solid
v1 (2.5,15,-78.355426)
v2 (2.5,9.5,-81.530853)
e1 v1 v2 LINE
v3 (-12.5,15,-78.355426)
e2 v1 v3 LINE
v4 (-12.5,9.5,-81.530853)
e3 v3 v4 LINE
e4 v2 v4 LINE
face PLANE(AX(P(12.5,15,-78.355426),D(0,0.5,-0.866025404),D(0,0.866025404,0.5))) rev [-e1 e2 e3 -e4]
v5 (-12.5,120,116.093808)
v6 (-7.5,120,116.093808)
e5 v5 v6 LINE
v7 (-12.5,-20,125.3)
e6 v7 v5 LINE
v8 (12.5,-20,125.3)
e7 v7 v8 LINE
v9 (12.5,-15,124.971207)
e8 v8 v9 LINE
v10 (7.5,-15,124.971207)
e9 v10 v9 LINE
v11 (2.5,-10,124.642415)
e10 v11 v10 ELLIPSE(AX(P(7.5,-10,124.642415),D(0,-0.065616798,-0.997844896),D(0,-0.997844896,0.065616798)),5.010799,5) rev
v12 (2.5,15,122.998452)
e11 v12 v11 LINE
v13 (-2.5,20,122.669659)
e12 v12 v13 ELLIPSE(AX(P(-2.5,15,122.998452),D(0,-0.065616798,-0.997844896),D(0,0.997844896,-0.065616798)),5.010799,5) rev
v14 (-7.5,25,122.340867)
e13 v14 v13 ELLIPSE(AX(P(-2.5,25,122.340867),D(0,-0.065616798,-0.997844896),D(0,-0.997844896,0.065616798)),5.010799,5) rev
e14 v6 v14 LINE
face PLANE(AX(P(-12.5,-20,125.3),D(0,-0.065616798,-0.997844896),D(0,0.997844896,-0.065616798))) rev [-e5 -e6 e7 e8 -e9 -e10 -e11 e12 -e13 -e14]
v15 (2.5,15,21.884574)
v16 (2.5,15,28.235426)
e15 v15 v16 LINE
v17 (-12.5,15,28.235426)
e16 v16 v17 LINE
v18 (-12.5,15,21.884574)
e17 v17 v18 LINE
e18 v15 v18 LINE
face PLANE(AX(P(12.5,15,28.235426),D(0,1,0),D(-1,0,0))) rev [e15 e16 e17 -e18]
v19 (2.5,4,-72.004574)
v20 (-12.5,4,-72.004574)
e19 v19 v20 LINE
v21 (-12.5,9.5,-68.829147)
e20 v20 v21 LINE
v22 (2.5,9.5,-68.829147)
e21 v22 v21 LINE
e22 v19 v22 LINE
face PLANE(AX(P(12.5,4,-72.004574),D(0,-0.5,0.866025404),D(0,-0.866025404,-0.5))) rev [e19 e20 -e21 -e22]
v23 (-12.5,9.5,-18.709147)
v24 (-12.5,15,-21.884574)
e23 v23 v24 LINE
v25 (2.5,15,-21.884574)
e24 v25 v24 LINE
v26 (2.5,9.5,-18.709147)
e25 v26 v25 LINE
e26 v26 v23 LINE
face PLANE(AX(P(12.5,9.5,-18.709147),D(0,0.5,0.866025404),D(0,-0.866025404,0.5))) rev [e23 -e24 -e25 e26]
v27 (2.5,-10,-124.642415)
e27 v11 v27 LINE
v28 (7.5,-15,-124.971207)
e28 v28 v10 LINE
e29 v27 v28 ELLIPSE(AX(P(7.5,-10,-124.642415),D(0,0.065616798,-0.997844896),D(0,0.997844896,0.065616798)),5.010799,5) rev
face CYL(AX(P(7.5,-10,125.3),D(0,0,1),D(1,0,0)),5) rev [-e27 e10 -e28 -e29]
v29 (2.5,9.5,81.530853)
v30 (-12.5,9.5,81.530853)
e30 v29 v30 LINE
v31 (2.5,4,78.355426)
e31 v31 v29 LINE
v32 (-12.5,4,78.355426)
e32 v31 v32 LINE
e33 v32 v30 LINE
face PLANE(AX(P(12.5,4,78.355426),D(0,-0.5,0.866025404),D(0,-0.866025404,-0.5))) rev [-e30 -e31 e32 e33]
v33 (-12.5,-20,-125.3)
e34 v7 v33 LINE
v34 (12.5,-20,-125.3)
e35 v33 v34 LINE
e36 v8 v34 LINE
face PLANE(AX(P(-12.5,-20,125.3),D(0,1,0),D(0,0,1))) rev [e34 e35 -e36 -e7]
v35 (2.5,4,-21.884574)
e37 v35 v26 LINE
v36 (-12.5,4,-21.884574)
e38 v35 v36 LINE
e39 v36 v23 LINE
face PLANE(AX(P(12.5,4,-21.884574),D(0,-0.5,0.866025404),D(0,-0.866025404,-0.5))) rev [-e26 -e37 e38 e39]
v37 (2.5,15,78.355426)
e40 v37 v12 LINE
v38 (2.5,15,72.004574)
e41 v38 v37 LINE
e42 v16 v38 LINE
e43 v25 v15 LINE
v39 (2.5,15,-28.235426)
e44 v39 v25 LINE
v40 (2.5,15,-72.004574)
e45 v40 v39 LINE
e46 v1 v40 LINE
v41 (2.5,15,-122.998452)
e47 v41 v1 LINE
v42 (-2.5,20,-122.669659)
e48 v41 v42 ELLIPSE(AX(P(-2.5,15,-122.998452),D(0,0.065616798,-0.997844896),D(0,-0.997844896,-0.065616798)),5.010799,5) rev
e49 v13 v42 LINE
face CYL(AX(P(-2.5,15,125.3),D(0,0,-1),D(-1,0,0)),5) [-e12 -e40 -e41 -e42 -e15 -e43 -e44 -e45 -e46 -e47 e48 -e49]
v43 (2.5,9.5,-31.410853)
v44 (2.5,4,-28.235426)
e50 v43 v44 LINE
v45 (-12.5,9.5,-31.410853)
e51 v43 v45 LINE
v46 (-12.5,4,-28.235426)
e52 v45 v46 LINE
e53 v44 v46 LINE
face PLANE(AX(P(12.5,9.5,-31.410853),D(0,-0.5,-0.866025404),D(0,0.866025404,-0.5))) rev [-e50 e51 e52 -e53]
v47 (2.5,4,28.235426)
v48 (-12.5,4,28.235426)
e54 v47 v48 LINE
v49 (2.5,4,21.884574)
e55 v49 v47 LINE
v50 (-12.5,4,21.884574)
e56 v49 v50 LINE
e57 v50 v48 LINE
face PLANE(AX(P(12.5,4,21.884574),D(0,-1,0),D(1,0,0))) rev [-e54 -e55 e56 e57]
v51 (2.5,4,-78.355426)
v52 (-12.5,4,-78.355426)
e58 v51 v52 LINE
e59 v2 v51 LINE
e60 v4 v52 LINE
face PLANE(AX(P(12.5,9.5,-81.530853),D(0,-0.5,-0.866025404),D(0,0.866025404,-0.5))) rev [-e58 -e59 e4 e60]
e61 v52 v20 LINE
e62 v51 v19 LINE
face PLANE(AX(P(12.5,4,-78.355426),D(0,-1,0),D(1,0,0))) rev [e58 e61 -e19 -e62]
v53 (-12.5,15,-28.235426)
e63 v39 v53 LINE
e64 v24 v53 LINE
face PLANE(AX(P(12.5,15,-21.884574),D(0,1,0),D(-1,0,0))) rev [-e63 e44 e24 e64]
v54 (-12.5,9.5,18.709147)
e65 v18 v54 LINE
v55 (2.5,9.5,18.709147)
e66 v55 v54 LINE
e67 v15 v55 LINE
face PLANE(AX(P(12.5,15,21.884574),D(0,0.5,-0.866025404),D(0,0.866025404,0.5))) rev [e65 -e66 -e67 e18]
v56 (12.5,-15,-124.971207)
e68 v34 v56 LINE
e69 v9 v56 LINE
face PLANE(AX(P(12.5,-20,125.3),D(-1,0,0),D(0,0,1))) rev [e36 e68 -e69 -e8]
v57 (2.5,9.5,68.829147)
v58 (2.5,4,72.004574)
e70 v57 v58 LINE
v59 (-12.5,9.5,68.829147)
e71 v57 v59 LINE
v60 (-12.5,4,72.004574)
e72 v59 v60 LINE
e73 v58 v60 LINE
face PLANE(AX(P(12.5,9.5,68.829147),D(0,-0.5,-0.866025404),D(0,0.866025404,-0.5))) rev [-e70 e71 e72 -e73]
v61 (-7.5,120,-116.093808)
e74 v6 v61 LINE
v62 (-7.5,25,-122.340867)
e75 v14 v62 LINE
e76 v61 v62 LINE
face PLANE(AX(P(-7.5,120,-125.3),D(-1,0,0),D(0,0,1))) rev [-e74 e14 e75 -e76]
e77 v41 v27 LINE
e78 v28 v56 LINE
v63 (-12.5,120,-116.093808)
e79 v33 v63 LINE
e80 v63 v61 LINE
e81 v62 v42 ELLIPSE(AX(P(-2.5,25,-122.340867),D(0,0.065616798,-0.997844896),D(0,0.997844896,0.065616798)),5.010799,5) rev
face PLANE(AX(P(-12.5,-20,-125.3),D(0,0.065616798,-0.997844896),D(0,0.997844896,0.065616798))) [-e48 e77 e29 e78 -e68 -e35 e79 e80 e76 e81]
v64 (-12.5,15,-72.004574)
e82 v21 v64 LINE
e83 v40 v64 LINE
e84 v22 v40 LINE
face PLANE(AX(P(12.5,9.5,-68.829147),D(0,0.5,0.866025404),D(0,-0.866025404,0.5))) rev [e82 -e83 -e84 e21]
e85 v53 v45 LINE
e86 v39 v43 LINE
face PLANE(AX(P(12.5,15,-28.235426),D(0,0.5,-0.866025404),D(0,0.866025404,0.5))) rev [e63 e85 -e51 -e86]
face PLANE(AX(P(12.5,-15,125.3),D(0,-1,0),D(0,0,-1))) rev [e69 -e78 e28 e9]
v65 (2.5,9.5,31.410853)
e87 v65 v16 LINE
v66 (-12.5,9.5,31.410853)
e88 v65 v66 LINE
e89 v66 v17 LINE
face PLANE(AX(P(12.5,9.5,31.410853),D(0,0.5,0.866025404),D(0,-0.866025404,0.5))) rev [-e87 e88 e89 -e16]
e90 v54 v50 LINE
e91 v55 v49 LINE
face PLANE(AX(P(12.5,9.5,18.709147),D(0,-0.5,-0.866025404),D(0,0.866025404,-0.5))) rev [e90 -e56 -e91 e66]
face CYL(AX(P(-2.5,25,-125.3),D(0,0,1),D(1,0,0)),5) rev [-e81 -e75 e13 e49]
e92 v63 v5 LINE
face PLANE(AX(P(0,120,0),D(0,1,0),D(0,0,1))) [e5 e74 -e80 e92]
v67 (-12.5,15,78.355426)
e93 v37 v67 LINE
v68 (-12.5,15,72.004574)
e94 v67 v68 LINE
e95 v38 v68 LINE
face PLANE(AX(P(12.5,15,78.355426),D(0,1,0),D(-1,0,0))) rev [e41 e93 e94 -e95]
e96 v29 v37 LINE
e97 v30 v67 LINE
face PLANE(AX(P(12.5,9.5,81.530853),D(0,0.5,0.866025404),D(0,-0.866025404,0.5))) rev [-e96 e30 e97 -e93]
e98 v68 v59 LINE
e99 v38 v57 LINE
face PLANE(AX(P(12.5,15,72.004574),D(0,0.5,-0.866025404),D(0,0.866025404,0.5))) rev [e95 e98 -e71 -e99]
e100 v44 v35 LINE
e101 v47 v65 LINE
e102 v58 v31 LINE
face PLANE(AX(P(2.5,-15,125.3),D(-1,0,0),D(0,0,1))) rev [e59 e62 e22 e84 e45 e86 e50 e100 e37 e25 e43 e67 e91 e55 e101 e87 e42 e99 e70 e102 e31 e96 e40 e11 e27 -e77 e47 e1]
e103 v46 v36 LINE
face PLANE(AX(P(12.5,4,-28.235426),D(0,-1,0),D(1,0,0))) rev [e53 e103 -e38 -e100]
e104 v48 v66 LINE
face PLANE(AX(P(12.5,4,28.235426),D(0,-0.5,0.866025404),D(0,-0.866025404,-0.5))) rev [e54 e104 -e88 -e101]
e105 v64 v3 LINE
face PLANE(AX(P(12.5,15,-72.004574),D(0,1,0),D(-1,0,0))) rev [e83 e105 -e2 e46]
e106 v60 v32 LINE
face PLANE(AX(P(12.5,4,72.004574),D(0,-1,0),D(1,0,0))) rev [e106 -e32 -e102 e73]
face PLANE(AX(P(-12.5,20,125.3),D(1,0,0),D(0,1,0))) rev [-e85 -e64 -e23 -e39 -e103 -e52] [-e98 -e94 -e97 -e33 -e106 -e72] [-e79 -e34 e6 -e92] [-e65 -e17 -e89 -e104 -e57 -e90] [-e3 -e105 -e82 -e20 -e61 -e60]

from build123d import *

# Parameters (mm, degrees)
GENERAL_EXTRUDE_DEPTH             = 125.3
ROUNDING_R                        = 5
ROLLER_HOLDERS_DEPTH              = 130.325519523
SKETCH5_W                         = 5
SKETCH5_H                         = 250.6
GUARD_RAIL_DEPTH                  = 100
GUARD_RAIL_SUPPORT_FILLET_R       = 5
SLANT_FOR_INPUT_FROM_SORTER_DEPTH = 175.642749635


with BuildPart() as part:
    # Sketch2 → General extrude (new, symmetric)
    with BuildSketch(Plane.XY):
        Polygon((-12.5, 20), (-12.5, -20), (12.5, -20), (12.5, -15), (2.5, -15), (2.5, 20), align=None)
    extrude(amount=GENERAL_EXTRUDE_DEPTH, both=True)

    # Rounding
    rounding_edges = [part.edges().sort_by_distance(p)[0] for p in [
        (2.5, 20, 0),
        (2.5, -15, 0),
    ]]
    fillet(rounding_edges, radius=ROUNDING_R)

    # Sketch3 → Roller holders (cut, through all)
    with BuildSketch(Plane.ZY.offset(12.5)):
        Polygon((-72.004573519, 4), (-68.829147039, 9.5), (-72.004573519, 15), (-78.355426481, 15), (-81.530852961, 9.5), (-78.355426481, 4), align=None)
        Polygon((-21.884573519, 4), (-18.709147039, 9.5), (-21.884573519, 15), (-28.235426481, 15), (-31.410852961, 9.5), (-28.235426481, 4), align=None)
        Polygon((28.235426481, 4), (31.410852961, 9.5), (28.235426481, 15), (21.884573519, 15), (18.709147039, 9.5), (21.884573519, 4), align=None)
        Polygon((78.355426481, 4), (81.530852961, 9.5), (78.355426481, 15), (72.004573519, 15), (68.829147039, 9.5), (72.004573519, 4), align=None)
    extrude(amount=-ROLLER_HOLDERS_DEPTH, mode=Mode.SUBTRACT)

    # Sketch5 → Guard rail (add)
    with BuildSketch(Plane(origin=(0, 20, 0), x_dir=(1, 0, 0), z_dir=(0, 1, 0))):
        with Locations((-10, 0)):
            Rectangle(SKETCH5_W, SKETCH5_H)
    extrude(amount=GUARD_RAIL_DEPTH)

    # Guard rail support fillet
    guard_rail_support_fillet_edges = [part.edges().sort_by_distance(p)[0] for p in [
        (-7.5, 20, 0),
    ]]
    fillet(guard_rail_support_fillet_edges, radius=GUARD_RAIL_SUPPORT_FILLET_R - 0.0001)  # a hair under: the kernel refuses the full size

    # Sketch6 → Slant for input from sorter (cut, symmetric)
    with BuildSketch(Plane(origin=(-7.5, 0, 0), x_dir=(0, 0, -1), z_dir=(1, 0, 0))):
        Polygon((-125.3, 120), (-125.3, -20), (-116.093807983, 120), align=None)
    slant_for_input_from_sorter = extrude(amount=SLANT_FOR_INPUT_FROM_SORTER_DEPTH, both=True, mode=Mode.SUBTRACT)

    # Mirror of cut above (since same part is used on both sides): Slant for input from sorter across plane
    add(slant_for_input_from_sorter.mirror(Plane.XY), mode=Mode.SUBTRACT)


solid = part.part
